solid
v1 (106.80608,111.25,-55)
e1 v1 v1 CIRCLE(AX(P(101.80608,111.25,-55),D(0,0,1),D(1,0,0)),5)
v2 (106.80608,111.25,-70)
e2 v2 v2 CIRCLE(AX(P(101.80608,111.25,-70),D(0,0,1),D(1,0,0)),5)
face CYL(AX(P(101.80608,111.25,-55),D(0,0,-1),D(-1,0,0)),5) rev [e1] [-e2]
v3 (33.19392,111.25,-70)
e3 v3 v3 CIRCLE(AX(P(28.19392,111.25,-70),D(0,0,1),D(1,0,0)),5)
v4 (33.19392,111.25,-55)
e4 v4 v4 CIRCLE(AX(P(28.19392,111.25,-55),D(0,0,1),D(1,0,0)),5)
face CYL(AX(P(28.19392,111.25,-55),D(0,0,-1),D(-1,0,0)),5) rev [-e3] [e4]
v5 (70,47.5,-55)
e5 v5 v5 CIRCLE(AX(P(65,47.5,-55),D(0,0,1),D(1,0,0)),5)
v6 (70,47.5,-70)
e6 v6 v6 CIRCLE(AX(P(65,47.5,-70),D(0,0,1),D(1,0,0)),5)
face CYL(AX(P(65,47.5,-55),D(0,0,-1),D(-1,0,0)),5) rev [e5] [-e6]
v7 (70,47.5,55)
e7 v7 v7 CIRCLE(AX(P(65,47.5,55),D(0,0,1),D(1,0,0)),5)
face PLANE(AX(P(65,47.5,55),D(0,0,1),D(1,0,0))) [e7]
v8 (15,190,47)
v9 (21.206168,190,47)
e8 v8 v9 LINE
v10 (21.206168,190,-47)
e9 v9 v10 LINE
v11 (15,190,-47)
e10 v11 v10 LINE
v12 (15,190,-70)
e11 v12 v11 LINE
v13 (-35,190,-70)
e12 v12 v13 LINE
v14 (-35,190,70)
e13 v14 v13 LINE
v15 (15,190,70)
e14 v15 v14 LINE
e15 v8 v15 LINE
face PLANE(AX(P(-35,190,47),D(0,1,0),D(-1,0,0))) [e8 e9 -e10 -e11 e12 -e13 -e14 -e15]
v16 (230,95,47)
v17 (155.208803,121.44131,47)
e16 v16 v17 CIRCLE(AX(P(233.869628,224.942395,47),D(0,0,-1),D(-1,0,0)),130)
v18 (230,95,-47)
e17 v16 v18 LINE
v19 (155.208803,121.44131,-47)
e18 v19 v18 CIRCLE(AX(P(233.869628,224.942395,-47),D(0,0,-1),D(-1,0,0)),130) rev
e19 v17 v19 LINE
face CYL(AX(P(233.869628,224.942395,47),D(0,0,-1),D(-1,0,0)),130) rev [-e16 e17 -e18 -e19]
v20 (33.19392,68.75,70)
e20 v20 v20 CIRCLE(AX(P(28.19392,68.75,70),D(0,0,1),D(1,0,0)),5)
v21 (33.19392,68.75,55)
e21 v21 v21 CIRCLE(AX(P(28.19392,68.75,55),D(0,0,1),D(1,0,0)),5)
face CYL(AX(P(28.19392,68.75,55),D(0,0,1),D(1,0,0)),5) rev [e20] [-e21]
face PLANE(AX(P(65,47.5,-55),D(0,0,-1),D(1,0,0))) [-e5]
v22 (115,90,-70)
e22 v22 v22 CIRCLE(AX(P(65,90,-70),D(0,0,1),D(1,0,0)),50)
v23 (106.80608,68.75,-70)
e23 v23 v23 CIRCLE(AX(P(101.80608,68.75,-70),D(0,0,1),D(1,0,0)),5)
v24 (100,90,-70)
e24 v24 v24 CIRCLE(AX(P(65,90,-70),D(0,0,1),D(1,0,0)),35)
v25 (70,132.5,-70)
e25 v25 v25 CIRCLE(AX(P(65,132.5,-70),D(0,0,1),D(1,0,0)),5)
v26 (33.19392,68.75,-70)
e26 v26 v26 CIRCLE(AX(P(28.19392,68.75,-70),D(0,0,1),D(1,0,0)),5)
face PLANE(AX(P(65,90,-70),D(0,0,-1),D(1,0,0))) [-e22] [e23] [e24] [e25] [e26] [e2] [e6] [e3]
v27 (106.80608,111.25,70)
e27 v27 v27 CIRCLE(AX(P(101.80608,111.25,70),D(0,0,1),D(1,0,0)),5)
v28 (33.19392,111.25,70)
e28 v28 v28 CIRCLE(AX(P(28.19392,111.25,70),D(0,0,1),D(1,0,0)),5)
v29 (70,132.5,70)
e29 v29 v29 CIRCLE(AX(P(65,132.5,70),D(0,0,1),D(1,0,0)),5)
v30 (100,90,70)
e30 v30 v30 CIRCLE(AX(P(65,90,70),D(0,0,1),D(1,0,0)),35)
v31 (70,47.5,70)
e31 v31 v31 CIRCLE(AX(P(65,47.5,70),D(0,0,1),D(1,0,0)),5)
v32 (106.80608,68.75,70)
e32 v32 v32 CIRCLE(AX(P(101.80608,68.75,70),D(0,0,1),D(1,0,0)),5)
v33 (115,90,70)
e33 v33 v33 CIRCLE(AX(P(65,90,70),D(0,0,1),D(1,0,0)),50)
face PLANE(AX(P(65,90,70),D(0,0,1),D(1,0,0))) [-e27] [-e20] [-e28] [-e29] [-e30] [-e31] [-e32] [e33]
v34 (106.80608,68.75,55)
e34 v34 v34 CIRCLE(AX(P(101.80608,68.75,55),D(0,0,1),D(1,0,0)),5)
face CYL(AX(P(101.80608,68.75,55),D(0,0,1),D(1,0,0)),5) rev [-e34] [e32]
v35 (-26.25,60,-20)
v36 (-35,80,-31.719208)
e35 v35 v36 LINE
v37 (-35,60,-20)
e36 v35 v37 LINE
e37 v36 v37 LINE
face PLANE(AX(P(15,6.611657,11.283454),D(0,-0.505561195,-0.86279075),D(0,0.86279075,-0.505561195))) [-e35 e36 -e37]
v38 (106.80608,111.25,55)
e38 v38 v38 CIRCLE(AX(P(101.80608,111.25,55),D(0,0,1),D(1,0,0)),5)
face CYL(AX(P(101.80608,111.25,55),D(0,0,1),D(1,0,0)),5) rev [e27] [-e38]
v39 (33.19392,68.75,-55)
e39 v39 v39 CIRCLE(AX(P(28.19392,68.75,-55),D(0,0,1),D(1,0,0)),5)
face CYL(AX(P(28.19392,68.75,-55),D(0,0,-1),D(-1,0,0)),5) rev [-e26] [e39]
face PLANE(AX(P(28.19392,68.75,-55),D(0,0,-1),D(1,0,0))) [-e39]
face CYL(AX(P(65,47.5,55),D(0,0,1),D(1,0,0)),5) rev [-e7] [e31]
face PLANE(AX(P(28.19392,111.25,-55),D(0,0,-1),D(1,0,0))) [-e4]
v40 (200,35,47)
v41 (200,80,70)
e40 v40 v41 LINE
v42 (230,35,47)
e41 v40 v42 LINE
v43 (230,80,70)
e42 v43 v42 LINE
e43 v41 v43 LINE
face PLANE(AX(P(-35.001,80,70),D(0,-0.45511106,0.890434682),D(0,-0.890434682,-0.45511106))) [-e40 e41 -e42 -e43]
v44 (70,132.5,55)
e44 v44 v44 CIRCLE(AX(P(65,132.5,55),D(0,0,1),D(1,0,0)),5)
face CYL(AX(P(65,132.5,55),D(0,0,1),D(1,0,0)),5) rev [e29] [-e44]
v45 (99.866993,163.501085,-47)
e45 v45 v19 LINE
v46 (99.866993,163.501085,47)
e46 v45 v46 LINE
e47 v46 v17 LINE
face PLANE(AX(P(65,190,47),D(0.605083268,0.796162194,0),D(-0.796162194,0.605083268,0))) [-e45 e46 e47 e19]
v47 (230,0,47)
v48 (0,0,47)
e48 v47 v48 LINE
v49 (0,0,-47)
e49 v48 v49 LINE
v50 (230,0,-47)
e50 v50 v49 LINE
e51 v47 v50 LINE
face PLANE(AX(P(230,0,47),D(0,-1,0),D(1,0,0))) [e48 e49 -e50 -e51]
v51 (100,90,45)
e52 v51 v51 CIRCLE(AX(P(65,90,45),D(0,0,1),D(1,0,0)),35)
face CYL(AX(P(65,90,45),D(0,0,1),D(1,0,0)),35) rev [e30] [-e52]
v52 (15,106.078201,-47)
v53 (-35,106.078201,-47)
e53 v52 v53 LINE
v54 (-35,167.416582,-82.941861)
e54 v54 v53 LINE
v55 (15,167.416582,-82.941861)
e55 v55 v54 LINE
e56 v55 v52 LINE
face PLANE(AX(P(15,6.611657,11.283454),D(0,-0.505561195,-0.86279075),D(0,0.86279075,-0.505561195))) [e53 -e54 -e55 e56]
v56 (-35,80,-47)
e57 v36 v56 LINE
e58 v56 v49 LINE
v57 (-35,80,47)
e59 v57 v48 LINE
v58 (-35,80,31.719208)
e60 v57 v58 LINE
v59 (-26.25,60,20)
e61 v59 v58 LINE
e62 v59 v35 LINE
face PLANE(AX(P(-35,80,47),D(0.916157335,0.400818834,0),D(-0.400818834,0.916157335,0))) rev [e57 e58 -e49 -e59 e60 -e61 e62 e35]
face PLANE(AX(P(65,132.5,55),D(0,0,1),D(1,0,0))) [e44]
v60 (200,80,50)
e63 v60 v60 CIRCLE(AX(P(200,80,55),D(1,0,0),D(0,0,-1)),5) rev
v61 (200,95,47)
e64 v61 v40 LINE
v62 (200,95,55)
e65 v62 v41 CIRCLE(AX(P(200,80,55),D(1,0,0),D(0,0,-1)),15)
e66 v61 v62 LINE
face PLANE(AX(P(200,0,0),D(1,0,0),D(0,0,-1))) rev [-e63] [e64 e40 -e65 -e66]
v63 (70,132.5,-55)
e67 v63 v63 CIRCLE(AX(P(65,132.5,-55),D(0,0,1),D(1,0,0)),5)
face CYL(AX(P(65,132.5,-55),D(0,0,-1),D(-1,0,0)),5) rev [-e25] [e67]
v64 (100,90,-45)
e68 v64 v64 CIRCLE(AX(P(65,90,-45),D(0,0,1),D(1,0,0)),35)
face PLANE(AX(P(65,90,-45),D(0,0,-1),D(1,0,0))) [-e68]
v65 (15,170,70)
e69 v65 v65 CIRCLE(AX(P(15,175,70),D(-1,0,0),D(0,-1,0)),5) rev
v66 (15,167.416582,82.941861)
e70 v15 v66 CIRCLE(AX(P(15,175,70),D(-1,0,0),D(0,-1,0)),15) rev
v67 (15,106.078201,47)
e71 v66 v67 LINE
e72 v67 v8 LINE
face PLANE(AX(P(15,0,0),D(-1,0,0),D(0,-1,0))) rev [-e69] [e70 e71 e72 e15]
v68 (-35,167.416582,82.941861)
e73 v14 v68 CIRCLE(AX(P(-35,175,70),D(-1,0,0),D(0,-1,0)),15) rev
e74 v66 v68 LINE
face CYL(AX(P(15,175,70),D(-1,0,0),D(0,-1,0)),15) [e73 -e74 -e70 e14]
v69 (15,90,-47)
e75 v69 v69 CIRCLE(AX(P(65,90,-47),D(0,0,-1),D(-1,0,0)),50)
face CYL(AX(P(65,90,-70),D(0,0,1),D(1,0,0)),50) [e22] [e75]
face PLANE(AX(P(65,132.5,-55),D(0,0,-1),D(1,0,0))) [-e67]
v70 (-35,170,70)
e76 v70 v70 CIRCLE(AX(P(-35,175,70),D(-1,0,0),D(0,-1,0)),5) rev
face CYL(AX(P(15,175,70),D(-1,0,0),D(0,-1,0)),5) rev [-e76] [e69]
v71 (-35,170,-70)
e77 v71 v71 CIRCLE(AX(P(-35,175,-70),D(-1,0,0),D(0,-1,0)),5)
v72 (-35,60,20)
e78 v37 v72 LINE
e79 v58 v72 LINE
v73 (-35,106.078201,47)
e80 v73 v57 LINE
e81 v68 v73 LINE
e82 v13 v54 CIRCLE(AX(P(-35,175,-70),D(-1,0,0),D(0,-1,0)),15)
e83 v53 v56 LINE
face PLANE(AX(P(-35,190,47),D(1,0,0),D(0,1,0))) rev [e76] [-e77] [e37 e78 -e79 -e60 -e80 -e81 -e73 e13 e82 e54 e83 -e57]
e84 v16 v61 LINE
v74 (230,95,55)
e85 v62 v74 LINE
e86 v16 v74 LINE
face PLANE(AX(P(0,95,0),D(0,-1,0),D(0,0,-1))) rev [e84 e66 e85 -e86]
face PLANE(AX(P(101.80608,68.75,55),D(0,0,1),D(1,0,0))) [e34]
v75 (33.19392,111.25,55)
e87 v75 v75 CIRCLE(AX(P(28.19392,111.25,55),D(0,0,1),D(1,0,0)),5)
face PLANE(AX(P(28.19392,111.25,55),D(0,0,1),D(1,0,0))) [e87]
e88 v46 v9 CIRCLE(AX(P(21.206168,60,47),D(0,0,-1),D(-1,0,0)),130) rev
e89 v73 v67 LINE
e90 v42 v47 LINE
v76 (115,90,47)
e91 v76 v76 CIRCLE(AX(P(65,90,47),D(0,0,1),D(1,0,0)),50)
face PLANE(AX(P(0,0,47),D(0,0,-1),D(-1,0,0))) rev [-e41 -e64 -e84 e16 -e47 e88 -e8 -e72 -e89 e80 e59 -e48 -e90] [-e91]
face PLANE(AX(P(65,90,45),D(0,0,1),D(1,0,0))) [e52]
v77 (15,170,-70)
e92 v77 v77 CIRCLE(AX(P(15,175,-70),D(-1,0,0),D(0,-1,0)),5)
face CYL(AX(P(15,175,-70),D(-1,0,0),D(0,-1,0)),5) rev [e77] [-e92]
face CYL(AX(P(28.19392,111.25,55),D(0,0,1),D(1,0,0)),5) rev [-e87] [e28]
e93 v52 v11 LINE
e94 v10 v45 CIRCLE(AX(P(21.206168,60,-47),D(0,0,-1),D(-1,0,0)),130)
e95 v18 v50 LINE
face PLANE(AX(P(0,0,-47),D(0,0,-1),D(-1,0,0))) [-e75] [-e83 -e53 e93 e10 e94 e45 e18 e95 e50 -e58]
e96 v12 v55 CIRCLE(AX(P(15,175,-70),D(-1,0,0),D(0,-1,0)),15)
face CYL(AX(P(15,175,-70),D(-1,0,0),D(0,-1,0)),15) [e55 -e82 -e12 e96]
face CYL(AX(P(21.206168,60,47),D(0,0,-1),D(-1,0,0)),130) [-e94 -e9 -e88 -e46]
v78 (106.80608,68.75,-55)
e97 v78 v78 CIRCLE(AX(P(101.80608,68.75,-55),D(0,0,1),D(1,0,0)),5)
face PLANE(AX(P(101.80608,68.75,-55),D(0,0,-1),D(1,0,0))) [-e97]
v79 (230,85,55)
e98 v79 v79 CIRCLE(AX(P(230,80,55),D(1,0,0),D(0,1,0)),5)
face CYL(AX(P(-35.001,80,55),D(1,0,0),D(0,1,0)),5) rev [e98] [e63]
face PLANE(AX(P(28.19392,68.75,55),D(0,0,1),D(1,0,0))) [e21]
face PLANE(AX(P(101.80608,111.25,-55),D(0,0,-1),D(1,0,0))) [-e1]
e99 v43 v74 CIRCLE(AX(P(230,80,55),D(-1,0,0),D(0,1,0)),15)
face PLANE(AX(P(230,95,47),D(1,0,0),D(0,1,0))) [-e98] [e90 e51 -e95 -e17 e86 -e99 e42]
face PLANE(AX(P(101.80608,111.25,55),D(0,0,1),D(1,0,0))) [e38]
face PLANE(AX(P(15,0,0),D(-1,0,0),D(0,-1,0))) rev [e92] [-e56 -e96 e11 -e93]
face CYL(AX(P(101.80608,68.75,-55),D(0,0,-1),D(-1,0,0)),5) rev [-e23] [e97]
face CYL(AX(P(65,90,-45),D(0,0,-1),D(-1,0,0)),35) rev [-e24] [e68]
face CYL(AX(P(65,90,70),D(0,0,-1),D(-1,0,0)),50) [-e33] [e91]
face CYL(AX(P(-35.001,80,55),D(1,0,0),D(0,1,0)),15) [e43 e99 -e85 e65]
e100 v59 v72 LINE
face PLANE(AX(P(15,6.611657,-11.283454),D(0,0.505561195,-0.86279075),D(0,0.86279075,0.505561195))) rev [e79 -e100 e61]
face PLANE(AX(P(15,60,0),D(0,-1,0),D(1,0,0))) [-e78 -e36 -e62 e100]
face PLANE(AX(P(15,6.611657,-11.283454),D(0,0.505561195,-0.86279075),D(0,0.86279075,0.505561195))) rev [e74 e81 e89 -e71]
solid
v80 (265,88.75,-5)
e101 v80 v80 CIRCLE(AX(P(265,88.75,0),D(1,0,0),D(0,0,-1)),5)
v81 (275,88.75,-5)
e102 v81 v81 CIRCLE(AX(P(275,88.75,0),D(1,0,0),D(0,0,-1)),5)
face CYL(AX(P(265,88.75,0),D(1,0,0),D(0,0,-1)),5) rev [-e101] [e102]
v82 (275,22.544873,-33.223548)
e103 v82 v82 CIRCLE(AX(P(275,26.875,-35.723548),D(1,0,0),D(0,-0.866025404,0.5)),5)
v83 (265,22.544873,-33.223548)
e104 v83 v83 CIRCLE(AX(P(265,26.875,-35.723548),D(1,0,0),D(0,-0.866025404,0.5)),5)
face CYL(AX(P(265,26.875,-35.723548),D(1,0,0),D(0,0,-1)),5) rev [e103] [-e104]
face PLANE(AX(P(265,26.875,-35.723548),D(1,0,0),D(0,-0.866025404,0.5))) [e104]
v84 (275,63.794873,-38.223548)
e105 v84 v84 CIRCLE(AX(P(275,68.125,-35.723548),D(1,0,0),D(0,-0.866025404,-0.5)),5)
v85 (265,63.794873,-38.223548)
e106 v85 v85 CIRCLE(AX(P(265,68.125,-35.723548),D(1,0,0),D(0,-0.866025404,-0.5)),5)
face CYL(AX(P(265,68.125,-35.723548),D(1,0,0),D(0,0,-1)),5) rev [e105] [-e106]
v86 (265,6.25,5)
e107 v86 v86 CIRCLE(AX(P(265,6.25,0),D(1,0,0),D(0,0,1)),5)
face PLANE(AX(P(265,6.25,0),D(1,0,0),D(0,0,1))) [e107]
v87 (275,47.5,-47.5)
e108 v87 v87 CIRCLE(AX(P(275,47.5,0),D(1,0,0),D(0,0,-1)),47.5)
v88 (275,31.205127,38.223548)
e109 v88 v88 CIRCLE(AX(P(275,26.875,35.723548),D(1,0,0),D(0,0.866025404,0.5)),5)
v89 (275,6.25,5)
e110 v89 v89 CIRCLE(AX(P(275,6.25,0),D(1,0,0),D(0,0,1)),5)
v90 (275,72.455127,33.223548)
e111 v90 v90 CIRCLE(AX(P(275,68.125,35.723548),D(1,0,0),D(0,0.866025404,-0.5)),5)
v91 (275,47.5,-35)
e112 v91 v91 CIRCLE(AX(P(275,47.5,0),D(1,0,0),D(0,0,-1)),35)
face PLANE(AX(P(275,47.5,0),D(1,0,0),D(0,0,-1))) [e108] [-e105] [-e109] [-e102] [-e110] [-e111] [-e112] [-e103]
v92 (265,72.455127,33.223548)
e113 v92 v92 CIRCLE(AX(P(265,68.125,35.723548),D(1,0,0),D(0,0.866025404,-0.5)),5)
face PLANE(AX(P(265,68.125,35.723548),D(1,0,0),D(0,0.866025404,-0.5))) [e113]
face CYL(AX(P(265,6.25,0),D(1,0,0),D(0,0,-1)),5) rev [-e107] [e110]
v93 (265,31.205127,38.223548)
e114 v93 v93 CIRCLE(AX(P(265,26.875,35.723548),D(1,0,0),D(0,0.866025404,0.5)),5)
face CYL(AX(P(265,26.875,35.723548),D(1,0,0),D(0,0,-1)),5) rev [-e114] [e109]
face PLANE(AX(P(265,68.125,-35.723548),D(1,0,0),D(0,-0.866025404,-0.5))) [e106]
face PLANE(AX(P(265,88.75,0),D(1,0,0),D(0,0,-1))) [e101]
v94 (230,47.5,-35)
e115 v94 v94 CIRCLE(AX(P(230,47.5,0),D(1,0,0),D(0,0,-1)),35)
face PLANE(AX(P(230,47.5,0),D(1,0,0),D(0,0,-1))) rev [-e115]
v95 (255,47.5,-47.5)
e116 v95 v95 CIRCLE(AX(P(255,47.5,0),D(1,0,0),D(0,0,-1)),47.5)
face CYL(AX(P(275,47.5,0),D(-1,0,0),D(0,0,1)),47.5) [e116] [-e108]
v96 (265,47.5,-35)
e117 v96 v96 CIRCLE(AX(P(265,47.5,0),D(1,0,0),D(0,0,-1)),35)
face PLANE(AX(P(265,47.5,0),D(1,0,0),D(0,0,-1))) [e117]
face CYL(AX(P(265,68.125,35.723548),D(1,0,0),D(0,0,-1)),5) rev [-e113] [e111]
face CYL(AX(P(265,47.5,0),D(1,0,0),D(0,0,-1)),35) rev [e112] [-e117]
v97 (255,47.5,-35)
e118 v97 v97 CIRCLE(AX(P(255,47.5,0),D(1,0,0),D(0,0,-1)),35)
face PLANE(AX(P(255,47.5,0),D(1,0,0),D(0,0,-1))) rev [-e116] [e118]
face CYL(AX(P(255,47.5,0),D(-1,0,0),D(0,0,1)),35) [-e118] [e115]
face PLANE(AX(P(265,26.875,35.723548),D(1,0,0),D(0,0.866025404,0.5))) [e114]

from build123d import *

# Parameters (mm, degrees)
DODANIE_WYCI_GNI_CIE1_DEPTH = 47
SZKIC2_R                    = 35
DODANIE_WYCI_GNI_CIE2_DEPTH = 25
SZKIC3_R                    = 47.5
DODANIE_WYCI_GNI_CIE3_DEPTH = 20
SZKIC7_R                    = 50
DODANIE_WYCI_GNI_CIE5_DEPTH = 23
SZKIC8_R                    = 35
WYTNIJ_WYCI_GNI_CIE1_DEPTH  = 25
SZKIC9_R                    = 5
WYTNIJ_WYCI_GNI_CIE2_DEPTH  = 15
SZKIC12_R                   = 5
DODANIE_WYCI_GNI_CIE6_DEPTH = 50
ZAOKR_GLENIE2_R             = 130
ZAOKR_GLENIE3_R             = 130
SZKIC4_R                    = 35
WYTNIJ_WYCI_GNI_CIE3_DEPTH  = 10
WYTNIJ_WYCI_GNI_CIE4_DEPTH  = 30
WYTNIJ_WYCI_GNI_CIE6_DEPTH  = 30
SZKIC20_R                   = 5
WYTNIJ_WYCI_GNI_CIE7_DEPTH  = 30
SZKIC21_R                   = 5
WYTNIJ_WYCI_GNI_CIE8_DEPTH  = 10
SZYK_KO_OWY1_COUNT          = 6


with BuildPart() as part:
    # Szkic1 → Dodanie-wyciągnięcie1 (new, symmetric)
    with BuildSketch(Plane.XY):
        Polygon((-35, 190), (65, 190), (190, 95), (230, 95), (230, 0), (0, 0), (-35, 80), align=None)
    extrude(amount=DODANIE_WYCI_GNI_CIE1_DEPTH, both=True)

    # Szkic7 → Dodanie-wyciągnięcie5 (add)
    with BuildSketch(Plane.XY.offset(47)):
        with Locations((65, 90)):
            Circle(SZKIC7_R)
    dodanie_wyci_gni_cie5 = extrude(amount=DODANIE_WYCI_GNI_CIE5_DEPTH)

    # Szkic8 → Wytnij-wyciągnięcie1 (cut)
    with BuildSketch(Plane.XY.offset(70)):
        with Locations((65, 90)):
            Circle(SZKIC8_R)
    wytnij_wyci_gni_cie1 = extrude(amount=-WYTNIJ_WYCI_GNI_CIE1_DEPTH, mode=Mode.SUBTRACT)

    # Szkic9 → Wytnij-wyciągnięcie2 (cut)
    with BuildSketch(Plane.XY.offset(70)):
        with Locations((65, 132.5)):
            Circle(SZKIC9_R)
        with Locations((101.806079661, 111.25)):
            Circle(SZKIC9_R)
        with Locations((101.806079661, 68.75)):
            Circle(SZKIC9_R)
        with Locations((65, 47.5)):
            Circle(SZKIC9_R)
        with Locations((28.193920339, 68.75)):
            Circle(SZKIC9_R)
        with Locations((28.193920339, 111.25)):
            Circle(SZKIC9_R)
    wytnij_wyci_gni_cie2 = extrude(amount=-WYTNIJ_WYCI_GNI_CIE2_DEPTH, mode=Mode.SUBTRACT)

    # Szkic12 → Dodanie-wyciągnięcie6 (add)
    # profile 1 of 6: a face of its own
    with BuildSketch(Plane.ZY.offset(35)):
        with BuildLine():
            Line((-47, 190), (-70, 190))
            ThreePointArc((-70, 190), (-83.014439461, 182.458174409), (-82.941861244, 167.416582068))
            Line((-82.941861244, 167.416582068), (-47, 106.078200716))
            Line((-47, 106.078200716), (-47, 190))
        make_face()
        with Locations(Location((-70, 175, 0), (0, 0, 270))):
            Circle(SZKIC12_R, mode=Mode.SUBTRACT)
    # profile 2 of 6: a face of its own
    with BuildSketch(Plane.ZY.offset(35)):
        Polygon((0, 190), (-47, 190), (-47, 106.078200716), (-31.7192076, 80), (0, 80), align=None)
    # profile 3 of 6: a face of its own
    with BuildSketch(Plane.ZY.offset(35)):
        Polygon((47, 190), (0, 190), (0, 80), (31.7192076, 80), (47, 106.078200716), align=None)
    # profile 4 of 6: a face of its own
    with BuildSketch(Plane.ZY.offset(35)):
        with BuildLine():
            Line((70, 190), (47, 190))
            Line((47, 190), (47, 106.078200716))
            Line((47, 106.078200716), (82.941861244, 167.416582068))
            ThreePointArc((82.941861244, 167.416582068), (83.014439461, 182.458174409), (70, 190))
        make_face()
        with Locations(Location((70, 175, 0), (0, 0, 270))):
            Circle(SZKIC12_R, mode=Mode.SUBTRACT)
    # profile 5 of 6: a face of its own
    with BuildSketch(Plane.ZY.offset(35)):
        Polygon((31.7192076, 80), (0, 80), (0, 60), (20, 60), align=None)
    # profile 6 of 6: a face of its own
    with BuildSketch(Plane.ZY.offset(35)):
        Polygon((0, 60), (0, 80), (-31.7192076, 80), (-20, 60), align=None)
    extrude(amount=-DODANIE_WYCI_GNI_CIE6_DEPTH)

    # Lustro1: Dodanie-wyciągnięcie5, Wytnij-wyciągnięcie1, Wytnij-wyciągnięcie2 across plane
    add(dodanie_wyci_gni_cie5.mirror(Plane.XY))
    add(wytnij_wyci_gni_cie1.mirror(Plane.XY), mode=Mode.SUBTRACT)
    add(wytnij_wyci_gni_cie2.mirror(Plane.XY), mode=Mode.SUBTRACT)

    # Zaokrąglenie2
    zaokr_glenie2_edges = [part.edges().sort_by_distance(p)[0] for p in [
        (65, 190, 0),
    ]]
    fillet(zaokr_glenie2_edges, radius=ZAOKR_GLENIE2_R)

    # Zaokrąglenie3
    # the kernel refuses this fillet: 130 mm, written as the material it adds along each edge
    with BuildSketch(Plane(origin=(190, 95, 47), x_dir=(-0.7961621941231027, 0.6050832675335577, 0), z_dir=(0, 0, -1))) as zaokr_glenie3_piece_1:
        with BuildLine():
            CenterArc((43.698629651, 130), ZAOKR_GLENIE3_R, 234.470905265, 35.529094735)
            Line((-31.846487765, 24.203330701), (-33.357390113, 22.087397315))
            ThreePointArc((-33.357390113, 22.087397315), (-17.496460378, 10.031643646), (-1.573216496, -2.070021705))
            Line((-1.573216496, -2.070021705), (0, -2.6))
            Line((0, -2.6), (43.698629651, -2.6))
            Line((43.698629651, -2.6), (43.698629651, 0))
        make_face()
    extrude(amount=94)

    # Szkic13 → Wyciągnięcie po profilach1 section 0
    with BuildSketch(Plane.XY.offset(47)):
        with BuildLine():
            Line((230, 95), (200, 95))
            Line((200, 95), (200, 35))
            Line((200, 35), (230, 35))
            Line((230, 35), (230, 95))
        make_face()
    # Szkic14 → Wyciągnięcie po profilach1 section 1
    with BuildSketch(Plane.XY.offset(70)):
        with BuildLine():
            Line((200, 95), (230, 95))
            Line((230, 95), (230, 60))
            Line((230, 60), (200, 60))
            Line((200, 60), (200, 95))
        make_face()
    loft()

    # Szkic15 → Wytnij-wyciągnięcie4 (cut)
    with BuildSketch(Plane(origin=(230, 0, 0), x_dir=(0, 0, -1), z_dir=(1, 0, 0))):
        with BuildLine():
            Line((-70, 80), (-70, 95))
            Line((-70, 95), (-55, 95))
            ThreePointArc((-55, 95), (-65.606601718, 90.606601718), (-70, 80))
        make_face()
    extrude(amount=-WYTNIJ_WYCI_GNI_CIE4_DEPTH, mode=Mode.SUBTRACT)

    # Szkic19 → Wytnij-wyciągnięcie6 (cut)
    with BuildSketch(Plane(origin=(230, 0, 0), x_dir=(0, 0, -1), z_dir=(1, 0, 0))):
        Polygon((-70, 80), (-47, 35), (-70, 60), align=None)
    extrude(amount=-WYTNIJ_WYCI_GNI_CIE6_DEPTH, mode=Mode.SUBTRACT)

    # Szkic20 → Wytnij-wyciągnięcie7 (cut)
    with BuildSketch(Plane(origin=(230, 0, 0), x_dir=(0, 0, -1), z_dir=(1, 0, 0))):
        with Locations(Location((-55, 80, 0), (0, 0, 90))):
            Circle(SZKIC20_R)
    extrude(amount=-WYTNIJ_WYCI_GNI_CIE7_DEPTH, mode=Mode.SUBTRACT)


with BuildPart() as body_2:
    # Szkic2 → Dodanie-wyciągnięcie2 (new body)
    with BuildSketch(Plane(origin=(230, 0, 0), x_dir=(0, 0, -1), z_dir=(1, 0, 0))):
        with Locations((0, 47.5)):
            Circle(SZKIC2_R)
    extrude(amount=DODANIE_WYCI_GNI_CIE2_DEPTH)

    # Szkic3 → Dodanie-wyciągnięcie3 (add)
    with BuildSketch(Plane(origin=(255, 0, 0), x_dir=(0, 0, -1), z_dir=(1, 0, 0))):
        with Locations((0, 47.5)):
            Circle(SZKIC3_R)
    extrude(amount=DODANIE_WYCI_GNI_CIE3_DEPTH)

    # Szkic4 → Wytnij-wyciągnięcie3 (cut)
    with BuildSketch(Plane(origin=(275, 0, 0), x_dir=(0, 0, -1), z_dir=(1, 0, 0))):
        with Locations((0, 47.5)):
            Circle(SZKIC4_R)
    extrude(amount=-WYTNIJ_WYCI_GNI_CIE3_DEPTH, mode=Mode.SUBTRACT)

    # Szkic21 → Wytnij-wyciągnięcie8 (cut)
    with BuildSketch(Plane(origin=(275, 0, 0), x_dir=(0, 0, -1), z_dir=(1, 0, 0))):
        with Locations((0, 88.75)):
            Circle(SZKIC21_R)
    wytnij_wyci_gni_cie8 = extrude(amount=-WYTNIJ_WYCI_GNI_CIE8_DEPTH, mode=Mode.SUBTRACT)

    # Szyk kołowy1: Wytnij-wyciągnięcie8 ×6 about axis
    szyk_ko_owy1_axis = Axis((0, 47.5, 0), (1, 0, 0))
    for i in range(1, SZYK_KO_OWY1_COUNT):
        add(wytnij_wyci_gni_cie8.rotate(szyk_ko_owy1_axis, i * 360 / SZYK_KO_OWY1_COUNT), mode=Mode.SUBTRACT)


solid = Compound([part.part, body_2.part])
